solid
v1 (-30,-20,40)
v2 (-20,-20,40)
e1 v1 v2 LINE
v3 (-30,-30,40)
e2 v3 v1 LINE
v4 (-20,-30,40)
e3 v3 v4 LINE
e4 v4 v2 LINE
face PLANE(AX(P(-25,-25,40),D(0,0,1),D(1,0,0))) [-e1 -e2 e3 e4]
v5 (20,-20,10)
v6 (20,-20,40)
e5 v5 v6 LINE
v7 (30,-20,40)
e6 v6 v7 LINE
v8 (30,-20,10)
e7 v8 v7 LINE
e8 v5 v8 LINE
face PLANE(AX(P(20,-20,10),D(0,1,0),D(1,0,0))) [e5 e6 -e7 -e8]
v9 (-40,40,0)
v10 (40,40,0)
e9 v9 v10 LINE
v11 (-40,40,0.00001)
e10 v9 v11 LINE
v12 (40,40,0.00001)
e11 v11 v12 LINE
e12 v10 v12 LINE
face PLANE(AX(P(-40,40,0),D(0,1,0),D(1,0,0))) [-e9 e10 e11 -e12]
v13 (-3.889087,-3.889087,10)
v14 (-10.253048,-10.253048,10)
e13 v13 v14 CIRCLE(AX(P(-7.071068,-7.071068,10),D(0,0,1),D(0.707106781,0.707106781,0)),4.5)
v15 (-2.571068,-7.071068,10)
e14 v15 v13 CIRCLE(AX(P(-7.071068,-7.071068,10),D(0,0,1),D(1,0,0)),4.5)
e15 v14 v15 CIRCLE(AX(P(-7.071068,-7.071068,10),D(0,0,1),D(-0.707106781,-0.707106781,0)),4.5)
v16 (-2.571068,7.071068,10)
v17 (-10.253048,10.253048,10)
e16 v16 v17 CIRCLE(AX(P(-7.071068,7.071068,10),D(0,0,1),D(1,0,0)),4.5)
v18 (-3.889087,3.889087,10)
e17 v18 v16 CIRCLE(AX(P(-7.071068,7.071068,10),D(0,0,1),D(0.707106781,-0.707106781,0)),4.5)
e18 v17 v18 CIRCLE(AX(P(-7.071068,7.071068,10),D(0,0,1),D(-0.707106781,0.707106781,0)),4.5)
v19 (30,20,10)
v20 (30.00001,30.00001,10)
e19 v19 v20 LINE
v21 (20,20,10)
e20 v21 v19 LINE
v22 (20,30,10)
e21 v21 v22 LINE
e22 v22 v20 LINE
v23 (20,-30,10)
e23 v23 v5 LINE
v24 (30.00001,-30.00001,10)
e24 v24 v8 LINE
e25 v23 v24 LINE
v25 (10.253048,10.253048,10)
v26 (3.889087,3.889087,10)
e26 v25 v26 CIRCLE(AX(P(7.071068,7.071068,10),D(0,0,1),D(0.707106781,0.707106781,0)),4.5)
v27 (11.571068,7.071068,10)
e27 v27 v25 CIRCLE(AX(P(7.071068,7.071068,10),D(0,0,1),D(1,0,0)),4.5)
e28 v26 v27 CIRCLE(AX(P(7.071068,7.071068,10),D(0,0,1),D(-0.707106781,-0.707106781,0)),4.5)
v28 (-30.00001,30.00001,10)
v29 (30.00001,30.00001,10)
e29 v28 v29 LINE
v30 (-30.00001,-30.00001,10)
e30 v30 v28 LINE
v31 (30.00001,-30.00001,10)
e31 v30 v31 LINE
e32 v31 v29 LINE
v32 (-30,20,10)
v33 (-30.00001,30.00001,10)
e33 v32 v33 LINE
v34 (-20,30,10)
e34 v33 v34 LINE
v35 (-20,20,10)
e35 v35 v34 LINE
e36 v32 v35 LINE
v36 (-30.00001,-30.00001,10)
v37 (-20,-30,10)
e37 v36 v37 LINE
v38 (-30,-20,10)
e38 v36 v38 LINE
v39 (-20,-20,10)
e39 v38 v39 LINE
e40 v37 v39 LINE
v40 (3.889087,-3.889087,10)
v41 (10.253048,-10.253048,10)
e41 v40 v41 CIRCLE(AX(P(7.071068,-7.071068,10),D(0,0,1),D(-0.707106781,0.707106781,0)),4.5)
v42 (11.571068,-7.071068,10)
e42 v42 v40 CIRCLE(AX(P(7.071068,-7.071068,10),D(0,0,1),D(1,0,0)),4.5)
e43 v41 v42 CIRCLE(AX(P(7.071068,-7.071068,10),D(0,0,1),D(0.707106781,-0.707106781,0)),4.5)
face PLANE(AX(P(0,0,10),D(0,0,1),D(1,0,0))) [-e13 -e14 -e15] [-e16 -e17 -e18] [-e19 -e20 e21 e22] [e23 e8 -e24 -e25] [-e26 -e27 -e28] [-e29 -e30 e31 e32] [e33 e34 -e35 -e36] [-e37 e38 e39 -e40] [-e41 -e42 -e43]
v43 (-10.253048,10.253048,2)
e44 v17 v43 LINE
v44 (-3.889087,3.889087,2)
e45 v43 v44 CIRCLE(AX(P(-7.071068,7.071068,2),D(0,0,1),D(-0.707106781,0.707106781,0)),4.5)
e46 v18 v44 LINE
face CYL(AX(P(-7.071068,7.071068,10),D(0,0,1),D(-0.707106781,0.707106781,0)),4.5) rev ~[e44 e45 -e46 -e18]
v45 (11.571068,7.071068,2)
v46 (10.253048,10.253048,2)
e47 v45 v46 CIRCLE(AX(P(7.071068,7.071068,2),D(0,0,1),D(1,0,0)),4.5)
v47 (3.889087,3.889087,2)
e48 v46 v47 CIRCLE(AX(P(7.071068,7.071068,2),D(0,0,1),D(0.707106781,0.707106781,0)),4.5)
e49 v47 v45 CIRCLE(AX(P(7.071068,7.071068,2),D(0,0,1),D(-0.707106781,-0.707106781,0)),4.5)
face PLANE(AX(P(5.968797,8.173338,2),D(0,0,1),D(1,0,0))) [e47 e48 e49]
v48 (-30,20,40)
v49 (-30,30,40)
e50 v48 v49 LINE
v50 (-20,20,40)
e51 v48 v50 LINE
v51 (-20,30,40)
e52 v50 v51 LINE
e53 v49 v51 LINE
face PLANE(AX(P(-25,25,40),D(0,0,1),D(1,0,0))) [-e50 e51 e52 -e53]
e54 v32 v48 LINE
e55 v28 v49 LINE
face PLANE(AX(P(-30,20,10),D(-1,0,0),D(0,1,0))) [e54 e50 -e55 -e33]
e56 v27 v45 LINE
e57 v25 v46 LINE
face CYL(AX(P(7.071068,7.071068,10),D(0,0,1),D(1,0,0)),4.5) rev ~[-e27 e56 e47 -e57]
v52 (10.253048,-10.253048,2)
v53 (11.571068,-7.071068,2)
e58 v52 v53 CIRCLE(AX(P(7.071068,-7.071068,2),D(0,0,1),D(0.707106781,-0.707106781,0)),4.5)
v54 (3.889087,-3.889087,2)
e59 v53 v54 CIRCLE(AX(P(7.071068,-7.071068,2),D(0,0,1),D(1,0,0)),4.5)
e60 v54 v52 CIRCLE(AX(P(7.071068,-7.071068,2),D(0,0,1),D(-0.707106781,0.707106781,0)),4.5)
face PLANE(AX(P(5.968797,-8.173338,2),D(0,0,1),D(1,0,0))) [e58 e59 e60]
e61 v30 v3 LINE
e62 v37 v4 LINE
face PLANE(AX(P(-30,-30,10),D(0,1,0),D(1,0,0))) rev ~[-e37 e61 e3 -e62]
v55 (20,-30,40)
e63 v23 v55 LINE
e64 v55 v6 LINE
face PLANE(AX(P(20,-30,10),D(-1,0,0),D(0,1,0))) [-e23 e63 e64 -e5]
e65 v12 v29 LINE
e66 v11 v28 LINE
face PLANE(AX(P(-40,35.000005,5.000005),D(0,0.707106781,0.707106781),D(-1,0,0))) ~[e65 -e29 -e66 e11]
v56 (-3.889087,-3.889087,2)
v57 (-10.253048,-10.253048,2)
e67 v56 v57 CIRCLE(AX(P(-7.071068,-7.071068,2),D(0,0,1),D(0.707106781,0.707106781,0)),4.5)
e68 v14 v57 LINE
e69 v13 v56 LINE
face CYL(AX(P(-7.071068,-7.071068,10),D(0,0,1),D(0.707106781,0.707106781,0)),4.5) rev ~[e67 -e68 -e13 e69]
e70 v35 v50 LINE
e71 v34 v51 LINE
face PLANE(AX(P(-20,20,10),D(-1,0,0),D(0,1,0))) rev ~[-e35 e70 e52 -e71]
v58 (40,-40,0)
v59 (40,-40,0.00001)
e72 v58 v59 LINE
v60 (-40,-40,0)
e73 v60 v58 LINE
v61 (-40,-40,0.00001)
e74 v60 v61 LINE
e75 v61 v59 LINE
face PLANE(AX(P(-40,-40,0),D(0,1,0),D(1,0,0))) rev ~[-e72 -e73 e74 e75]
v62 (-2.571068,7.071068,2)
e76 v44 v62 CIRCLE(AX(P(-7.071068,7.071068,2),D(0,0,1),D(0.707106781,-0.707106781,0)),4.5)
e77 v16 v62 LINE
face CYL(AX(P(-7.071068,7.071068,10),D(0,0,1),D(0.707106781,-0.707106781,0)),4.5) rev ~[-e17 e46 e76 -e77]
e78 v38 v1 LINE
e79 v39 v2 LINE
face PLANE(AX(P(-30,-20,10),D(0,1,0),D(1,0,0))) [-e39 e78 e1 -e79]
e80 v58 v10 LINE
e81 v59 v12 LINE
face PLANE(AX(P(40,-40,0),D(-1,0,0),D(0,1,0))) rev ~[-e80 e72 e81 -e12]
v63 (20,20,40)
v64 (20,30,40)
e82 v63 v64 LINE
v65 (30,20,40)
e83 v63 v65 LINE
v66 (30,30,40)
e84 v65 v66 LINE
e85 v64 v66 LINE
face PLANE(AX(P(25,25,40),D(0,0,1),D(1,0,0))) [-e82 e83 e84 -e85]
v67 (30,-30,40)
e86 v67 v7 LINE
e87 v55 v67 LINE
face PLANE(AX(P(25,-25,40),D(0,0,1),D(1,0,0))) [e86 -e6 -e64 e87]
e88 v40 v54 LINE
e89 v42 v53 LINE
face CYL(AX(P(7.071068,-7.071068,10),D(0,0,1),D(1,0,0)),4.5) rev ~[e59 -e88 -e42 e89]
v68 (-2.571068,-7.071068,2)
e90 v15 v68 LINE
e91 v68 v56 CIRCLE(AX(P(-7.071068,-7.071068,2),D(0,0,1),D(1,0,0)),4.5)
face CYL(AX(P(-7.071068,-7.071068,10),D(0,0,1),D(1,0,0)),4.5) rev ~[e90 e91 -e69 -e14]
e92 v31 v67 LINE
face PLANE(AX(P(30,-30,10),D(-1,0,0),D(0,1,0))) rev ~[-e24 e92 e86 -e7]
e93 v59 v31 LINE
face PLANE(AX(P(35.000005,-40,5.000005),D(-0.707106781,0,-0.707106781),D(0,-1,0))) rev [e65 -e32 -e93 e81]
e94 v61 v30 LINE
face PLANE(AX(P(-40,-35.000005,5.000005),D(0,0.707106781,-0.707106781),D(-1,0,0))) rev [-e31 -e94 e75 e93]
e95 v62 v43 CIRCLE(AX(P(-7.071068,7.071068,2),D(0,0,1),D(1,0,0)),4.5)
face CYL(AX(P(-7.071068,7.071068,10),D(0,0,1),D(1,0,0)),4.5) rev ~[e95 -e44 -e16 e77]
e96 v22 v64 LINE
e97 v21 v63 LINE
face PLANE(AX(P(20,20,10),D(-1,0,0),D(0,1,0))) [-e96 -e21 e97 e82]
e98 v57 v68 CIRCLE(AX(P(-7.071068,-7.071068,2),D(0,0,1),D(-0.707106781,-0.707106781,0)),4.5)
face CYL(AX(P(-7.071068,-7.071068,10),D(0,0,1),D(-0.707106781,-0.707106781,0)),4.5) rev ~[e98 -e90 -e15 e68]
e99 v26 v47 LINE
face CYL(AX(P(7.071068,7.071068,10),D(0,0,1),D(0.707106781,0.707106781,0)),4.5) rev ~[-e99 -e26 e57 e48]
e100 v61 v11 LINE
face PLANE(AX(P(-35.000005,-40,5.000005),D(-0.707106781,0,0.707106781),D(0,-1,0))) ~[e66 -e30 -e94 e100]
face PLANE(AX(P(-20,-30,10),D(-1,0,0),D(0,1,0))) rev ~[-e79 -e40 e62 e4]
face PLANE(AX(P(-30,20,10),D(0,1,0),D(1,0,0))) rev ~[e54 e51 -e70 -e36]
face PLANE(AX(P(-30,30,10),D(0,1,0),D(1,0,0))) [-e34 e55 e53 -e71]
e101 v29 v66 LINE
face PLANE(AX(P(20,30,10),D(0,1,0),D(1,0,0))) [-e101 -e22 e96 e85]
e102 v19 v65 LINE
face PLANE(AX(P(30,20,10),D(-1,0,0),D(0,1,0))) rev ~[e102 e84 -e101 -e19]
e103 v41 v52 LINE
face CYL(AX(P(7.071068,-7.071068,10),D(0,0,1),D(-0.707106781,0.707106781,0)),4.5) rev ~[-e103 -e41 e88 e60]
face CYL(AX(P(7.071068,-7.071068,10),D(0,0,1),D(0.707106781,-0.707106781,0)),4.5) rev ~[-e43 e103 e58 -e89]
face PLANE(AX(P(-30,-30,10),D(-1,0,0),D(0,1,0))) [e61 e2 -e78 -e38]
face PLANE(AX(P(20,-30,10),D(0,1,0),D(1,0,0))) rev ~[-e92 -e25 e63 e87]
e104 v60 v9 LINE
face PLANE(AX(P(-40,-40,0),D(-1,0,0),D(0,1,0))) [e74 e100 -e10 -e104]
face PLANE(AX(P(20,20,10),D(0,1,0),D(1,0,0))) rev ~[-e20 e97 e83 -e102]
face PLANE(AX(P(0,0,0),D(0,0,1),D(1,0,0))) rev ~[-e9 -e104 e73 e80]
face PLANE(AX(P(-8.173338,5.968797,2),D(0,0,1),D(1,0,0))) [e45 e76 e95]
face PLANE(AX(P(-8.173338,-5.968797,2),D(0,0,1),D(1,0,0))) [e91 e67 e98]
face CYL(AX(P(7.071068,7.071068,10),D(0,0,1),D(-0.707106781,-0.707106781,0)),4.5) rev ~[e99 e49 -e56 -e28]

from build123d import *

# Parameters (mm, degrees)
F0_W     = 80
F0_H     = 80
F1_DEPTH = 10
F2_SIZE2 = 9.99999
F2_SIZE  = 9.99999
F3_W     = 10
F3_H     = 10
F4_DEPTH = 30
F6_DEPTH = 8


# Not quite as in the source:
# - a fillet or chamfer is up to 0.001 mm smaller than in the source, because OpenCascade refuses the exact size


with BuildPart() as f1:
    # F0 (on Top) → F1 (new body)
    with BuildSketch(Plane.XY):
        Rectangle(F0_W, F0_H)
    extrude(amount=F1_DEPTH)

    # F2 (size 10 and 10 in the source; OpenCascade refuses exactly that, so slightly less here)
    f2_edges = [f1.edges().sort_by_distance(p)[0] for p in [
        (0, 40, 10),
        (-40, 0, 10),
        (0, -40, 10),
        (40, 0, 10),
    ]]
    chamfer(f2_edges, length=F2_SIZE, length2=F2_SIZE2)

    # F3 (on face) → F4 (join)
    with BuildSketch(Plane.XY.offset(10)):
        with Locations((-25, 25)):
            Rectangle(F3_W, F3_H)
        with Locations((-25, -25)):
            Rectangle(F3_W, F3_H)
        with Locations((25, 25)):
            Rectangle(F3_W, F3_H)
        with Locations((25, -25)):
            Rectangle(F3_W, F3_H)
    extrude(amount=F4_DEPTH)

    # F5 (on face) → F6 (cut)
    with BuildSketch(Plane.XY.offset(10)):
        with BuildLine():
            Line((-3.8890872965, 3.8890872965), (-10.2530483272, 10.2530483272))
            ThreePointArc((-10.2530483272, 10.2530483272), (-10.2530483272, 3.8890872965), (-3.8890872965, 3.8890872965))
        make_face()
        with BuildLine():
            ThreePointArc((-2.5710678119, 7.0710678119), (-5.3489923662, 11.2285257082), (-10.2530483272, 10.2530483272))
            Line((-10.2530483272, 10.2530483272), (-3.8890872965, 3.8890872965))
            ThreePointArc((-3.8890872965, 3.8890872965), (-2.9136099156, 5.3489923662), (-2.5710678119, 7.0710678119))
        make_face()
        with BuildLine():
            ThreePointArc((10.2530483272, 10.2530483272), (3.8890872965, 10.2530483272), (3.8890872965, 3.8890872965))
            Line((3.8890872965, 3.8890872965), (10.2530483272, 10.2530483272))
        make_face()
        with BuildLine():
            Line((10.2530483272, 10.2530483272), (3.8890872965, 3.8890872965))
            ThreePointArc((3.8890872965, 3.8890872965), (8.7931432575, 2.9136099156), (11.5710678119, 7.0710678119))
            ThreePointArc((11.5710678119, 7.0710678119), (11.2285257082, 8.7931432575), (10.2530483272, 10.2530483272))
        make_face()
        with BuildLine():
            Line((-10.2530483272, -10.2530483272), (-3.8890872965, -3.8890872965))
            ThreePointArc((-3.8890872965, -3.8890872965), (-10.2530483272, -3.8890872965), (-10.2530483272, -10.2530483272))
        make_face()
        with BuildLine():
            ThreePointArc((-2.5710678119, -7.0710678119), (-2.9136099156, -5.3489923662), (-3.8890872965, -3.8890872965))
            Line((-3.8890872965, -3.8890872965), (-10.2530483272, -10.2530483272))
            ThreePointArc((-10.2530483272, -10.2530483272), (-5.3489923662, -11.2285257082), (-2.5710678119, -7.0710678119))
        make_face()
        with BuildLine():
            Line((10.2530483272, -10.2530483272), (3.8890872965, -3.8890872965))
            ThreePointArc((3.8890872965, -3.8890872965), (3.8890872965, -10.2530483272), (10.2530483272, -10.2530483272))
        make_face()
        with BuildLine():
            ThreePointArc((11.5710678119, -7.0710678119), (8.7931432575, -2.9136099156), (3.8890872965, -3.8890872965))
            Line((3.8890872965, -3.8890872965), (10.2530483272, -10.2530483272))
            ThreePointArc((10.2530483272, -10.2530483272), (11.2285257082, -8.7931432575), (11.5710678119, -7.0710678119))
        make_face()
    extrude(amount=-F6_DEPTH, mode=Mode.SUBTRACT)


solid = f1.part
